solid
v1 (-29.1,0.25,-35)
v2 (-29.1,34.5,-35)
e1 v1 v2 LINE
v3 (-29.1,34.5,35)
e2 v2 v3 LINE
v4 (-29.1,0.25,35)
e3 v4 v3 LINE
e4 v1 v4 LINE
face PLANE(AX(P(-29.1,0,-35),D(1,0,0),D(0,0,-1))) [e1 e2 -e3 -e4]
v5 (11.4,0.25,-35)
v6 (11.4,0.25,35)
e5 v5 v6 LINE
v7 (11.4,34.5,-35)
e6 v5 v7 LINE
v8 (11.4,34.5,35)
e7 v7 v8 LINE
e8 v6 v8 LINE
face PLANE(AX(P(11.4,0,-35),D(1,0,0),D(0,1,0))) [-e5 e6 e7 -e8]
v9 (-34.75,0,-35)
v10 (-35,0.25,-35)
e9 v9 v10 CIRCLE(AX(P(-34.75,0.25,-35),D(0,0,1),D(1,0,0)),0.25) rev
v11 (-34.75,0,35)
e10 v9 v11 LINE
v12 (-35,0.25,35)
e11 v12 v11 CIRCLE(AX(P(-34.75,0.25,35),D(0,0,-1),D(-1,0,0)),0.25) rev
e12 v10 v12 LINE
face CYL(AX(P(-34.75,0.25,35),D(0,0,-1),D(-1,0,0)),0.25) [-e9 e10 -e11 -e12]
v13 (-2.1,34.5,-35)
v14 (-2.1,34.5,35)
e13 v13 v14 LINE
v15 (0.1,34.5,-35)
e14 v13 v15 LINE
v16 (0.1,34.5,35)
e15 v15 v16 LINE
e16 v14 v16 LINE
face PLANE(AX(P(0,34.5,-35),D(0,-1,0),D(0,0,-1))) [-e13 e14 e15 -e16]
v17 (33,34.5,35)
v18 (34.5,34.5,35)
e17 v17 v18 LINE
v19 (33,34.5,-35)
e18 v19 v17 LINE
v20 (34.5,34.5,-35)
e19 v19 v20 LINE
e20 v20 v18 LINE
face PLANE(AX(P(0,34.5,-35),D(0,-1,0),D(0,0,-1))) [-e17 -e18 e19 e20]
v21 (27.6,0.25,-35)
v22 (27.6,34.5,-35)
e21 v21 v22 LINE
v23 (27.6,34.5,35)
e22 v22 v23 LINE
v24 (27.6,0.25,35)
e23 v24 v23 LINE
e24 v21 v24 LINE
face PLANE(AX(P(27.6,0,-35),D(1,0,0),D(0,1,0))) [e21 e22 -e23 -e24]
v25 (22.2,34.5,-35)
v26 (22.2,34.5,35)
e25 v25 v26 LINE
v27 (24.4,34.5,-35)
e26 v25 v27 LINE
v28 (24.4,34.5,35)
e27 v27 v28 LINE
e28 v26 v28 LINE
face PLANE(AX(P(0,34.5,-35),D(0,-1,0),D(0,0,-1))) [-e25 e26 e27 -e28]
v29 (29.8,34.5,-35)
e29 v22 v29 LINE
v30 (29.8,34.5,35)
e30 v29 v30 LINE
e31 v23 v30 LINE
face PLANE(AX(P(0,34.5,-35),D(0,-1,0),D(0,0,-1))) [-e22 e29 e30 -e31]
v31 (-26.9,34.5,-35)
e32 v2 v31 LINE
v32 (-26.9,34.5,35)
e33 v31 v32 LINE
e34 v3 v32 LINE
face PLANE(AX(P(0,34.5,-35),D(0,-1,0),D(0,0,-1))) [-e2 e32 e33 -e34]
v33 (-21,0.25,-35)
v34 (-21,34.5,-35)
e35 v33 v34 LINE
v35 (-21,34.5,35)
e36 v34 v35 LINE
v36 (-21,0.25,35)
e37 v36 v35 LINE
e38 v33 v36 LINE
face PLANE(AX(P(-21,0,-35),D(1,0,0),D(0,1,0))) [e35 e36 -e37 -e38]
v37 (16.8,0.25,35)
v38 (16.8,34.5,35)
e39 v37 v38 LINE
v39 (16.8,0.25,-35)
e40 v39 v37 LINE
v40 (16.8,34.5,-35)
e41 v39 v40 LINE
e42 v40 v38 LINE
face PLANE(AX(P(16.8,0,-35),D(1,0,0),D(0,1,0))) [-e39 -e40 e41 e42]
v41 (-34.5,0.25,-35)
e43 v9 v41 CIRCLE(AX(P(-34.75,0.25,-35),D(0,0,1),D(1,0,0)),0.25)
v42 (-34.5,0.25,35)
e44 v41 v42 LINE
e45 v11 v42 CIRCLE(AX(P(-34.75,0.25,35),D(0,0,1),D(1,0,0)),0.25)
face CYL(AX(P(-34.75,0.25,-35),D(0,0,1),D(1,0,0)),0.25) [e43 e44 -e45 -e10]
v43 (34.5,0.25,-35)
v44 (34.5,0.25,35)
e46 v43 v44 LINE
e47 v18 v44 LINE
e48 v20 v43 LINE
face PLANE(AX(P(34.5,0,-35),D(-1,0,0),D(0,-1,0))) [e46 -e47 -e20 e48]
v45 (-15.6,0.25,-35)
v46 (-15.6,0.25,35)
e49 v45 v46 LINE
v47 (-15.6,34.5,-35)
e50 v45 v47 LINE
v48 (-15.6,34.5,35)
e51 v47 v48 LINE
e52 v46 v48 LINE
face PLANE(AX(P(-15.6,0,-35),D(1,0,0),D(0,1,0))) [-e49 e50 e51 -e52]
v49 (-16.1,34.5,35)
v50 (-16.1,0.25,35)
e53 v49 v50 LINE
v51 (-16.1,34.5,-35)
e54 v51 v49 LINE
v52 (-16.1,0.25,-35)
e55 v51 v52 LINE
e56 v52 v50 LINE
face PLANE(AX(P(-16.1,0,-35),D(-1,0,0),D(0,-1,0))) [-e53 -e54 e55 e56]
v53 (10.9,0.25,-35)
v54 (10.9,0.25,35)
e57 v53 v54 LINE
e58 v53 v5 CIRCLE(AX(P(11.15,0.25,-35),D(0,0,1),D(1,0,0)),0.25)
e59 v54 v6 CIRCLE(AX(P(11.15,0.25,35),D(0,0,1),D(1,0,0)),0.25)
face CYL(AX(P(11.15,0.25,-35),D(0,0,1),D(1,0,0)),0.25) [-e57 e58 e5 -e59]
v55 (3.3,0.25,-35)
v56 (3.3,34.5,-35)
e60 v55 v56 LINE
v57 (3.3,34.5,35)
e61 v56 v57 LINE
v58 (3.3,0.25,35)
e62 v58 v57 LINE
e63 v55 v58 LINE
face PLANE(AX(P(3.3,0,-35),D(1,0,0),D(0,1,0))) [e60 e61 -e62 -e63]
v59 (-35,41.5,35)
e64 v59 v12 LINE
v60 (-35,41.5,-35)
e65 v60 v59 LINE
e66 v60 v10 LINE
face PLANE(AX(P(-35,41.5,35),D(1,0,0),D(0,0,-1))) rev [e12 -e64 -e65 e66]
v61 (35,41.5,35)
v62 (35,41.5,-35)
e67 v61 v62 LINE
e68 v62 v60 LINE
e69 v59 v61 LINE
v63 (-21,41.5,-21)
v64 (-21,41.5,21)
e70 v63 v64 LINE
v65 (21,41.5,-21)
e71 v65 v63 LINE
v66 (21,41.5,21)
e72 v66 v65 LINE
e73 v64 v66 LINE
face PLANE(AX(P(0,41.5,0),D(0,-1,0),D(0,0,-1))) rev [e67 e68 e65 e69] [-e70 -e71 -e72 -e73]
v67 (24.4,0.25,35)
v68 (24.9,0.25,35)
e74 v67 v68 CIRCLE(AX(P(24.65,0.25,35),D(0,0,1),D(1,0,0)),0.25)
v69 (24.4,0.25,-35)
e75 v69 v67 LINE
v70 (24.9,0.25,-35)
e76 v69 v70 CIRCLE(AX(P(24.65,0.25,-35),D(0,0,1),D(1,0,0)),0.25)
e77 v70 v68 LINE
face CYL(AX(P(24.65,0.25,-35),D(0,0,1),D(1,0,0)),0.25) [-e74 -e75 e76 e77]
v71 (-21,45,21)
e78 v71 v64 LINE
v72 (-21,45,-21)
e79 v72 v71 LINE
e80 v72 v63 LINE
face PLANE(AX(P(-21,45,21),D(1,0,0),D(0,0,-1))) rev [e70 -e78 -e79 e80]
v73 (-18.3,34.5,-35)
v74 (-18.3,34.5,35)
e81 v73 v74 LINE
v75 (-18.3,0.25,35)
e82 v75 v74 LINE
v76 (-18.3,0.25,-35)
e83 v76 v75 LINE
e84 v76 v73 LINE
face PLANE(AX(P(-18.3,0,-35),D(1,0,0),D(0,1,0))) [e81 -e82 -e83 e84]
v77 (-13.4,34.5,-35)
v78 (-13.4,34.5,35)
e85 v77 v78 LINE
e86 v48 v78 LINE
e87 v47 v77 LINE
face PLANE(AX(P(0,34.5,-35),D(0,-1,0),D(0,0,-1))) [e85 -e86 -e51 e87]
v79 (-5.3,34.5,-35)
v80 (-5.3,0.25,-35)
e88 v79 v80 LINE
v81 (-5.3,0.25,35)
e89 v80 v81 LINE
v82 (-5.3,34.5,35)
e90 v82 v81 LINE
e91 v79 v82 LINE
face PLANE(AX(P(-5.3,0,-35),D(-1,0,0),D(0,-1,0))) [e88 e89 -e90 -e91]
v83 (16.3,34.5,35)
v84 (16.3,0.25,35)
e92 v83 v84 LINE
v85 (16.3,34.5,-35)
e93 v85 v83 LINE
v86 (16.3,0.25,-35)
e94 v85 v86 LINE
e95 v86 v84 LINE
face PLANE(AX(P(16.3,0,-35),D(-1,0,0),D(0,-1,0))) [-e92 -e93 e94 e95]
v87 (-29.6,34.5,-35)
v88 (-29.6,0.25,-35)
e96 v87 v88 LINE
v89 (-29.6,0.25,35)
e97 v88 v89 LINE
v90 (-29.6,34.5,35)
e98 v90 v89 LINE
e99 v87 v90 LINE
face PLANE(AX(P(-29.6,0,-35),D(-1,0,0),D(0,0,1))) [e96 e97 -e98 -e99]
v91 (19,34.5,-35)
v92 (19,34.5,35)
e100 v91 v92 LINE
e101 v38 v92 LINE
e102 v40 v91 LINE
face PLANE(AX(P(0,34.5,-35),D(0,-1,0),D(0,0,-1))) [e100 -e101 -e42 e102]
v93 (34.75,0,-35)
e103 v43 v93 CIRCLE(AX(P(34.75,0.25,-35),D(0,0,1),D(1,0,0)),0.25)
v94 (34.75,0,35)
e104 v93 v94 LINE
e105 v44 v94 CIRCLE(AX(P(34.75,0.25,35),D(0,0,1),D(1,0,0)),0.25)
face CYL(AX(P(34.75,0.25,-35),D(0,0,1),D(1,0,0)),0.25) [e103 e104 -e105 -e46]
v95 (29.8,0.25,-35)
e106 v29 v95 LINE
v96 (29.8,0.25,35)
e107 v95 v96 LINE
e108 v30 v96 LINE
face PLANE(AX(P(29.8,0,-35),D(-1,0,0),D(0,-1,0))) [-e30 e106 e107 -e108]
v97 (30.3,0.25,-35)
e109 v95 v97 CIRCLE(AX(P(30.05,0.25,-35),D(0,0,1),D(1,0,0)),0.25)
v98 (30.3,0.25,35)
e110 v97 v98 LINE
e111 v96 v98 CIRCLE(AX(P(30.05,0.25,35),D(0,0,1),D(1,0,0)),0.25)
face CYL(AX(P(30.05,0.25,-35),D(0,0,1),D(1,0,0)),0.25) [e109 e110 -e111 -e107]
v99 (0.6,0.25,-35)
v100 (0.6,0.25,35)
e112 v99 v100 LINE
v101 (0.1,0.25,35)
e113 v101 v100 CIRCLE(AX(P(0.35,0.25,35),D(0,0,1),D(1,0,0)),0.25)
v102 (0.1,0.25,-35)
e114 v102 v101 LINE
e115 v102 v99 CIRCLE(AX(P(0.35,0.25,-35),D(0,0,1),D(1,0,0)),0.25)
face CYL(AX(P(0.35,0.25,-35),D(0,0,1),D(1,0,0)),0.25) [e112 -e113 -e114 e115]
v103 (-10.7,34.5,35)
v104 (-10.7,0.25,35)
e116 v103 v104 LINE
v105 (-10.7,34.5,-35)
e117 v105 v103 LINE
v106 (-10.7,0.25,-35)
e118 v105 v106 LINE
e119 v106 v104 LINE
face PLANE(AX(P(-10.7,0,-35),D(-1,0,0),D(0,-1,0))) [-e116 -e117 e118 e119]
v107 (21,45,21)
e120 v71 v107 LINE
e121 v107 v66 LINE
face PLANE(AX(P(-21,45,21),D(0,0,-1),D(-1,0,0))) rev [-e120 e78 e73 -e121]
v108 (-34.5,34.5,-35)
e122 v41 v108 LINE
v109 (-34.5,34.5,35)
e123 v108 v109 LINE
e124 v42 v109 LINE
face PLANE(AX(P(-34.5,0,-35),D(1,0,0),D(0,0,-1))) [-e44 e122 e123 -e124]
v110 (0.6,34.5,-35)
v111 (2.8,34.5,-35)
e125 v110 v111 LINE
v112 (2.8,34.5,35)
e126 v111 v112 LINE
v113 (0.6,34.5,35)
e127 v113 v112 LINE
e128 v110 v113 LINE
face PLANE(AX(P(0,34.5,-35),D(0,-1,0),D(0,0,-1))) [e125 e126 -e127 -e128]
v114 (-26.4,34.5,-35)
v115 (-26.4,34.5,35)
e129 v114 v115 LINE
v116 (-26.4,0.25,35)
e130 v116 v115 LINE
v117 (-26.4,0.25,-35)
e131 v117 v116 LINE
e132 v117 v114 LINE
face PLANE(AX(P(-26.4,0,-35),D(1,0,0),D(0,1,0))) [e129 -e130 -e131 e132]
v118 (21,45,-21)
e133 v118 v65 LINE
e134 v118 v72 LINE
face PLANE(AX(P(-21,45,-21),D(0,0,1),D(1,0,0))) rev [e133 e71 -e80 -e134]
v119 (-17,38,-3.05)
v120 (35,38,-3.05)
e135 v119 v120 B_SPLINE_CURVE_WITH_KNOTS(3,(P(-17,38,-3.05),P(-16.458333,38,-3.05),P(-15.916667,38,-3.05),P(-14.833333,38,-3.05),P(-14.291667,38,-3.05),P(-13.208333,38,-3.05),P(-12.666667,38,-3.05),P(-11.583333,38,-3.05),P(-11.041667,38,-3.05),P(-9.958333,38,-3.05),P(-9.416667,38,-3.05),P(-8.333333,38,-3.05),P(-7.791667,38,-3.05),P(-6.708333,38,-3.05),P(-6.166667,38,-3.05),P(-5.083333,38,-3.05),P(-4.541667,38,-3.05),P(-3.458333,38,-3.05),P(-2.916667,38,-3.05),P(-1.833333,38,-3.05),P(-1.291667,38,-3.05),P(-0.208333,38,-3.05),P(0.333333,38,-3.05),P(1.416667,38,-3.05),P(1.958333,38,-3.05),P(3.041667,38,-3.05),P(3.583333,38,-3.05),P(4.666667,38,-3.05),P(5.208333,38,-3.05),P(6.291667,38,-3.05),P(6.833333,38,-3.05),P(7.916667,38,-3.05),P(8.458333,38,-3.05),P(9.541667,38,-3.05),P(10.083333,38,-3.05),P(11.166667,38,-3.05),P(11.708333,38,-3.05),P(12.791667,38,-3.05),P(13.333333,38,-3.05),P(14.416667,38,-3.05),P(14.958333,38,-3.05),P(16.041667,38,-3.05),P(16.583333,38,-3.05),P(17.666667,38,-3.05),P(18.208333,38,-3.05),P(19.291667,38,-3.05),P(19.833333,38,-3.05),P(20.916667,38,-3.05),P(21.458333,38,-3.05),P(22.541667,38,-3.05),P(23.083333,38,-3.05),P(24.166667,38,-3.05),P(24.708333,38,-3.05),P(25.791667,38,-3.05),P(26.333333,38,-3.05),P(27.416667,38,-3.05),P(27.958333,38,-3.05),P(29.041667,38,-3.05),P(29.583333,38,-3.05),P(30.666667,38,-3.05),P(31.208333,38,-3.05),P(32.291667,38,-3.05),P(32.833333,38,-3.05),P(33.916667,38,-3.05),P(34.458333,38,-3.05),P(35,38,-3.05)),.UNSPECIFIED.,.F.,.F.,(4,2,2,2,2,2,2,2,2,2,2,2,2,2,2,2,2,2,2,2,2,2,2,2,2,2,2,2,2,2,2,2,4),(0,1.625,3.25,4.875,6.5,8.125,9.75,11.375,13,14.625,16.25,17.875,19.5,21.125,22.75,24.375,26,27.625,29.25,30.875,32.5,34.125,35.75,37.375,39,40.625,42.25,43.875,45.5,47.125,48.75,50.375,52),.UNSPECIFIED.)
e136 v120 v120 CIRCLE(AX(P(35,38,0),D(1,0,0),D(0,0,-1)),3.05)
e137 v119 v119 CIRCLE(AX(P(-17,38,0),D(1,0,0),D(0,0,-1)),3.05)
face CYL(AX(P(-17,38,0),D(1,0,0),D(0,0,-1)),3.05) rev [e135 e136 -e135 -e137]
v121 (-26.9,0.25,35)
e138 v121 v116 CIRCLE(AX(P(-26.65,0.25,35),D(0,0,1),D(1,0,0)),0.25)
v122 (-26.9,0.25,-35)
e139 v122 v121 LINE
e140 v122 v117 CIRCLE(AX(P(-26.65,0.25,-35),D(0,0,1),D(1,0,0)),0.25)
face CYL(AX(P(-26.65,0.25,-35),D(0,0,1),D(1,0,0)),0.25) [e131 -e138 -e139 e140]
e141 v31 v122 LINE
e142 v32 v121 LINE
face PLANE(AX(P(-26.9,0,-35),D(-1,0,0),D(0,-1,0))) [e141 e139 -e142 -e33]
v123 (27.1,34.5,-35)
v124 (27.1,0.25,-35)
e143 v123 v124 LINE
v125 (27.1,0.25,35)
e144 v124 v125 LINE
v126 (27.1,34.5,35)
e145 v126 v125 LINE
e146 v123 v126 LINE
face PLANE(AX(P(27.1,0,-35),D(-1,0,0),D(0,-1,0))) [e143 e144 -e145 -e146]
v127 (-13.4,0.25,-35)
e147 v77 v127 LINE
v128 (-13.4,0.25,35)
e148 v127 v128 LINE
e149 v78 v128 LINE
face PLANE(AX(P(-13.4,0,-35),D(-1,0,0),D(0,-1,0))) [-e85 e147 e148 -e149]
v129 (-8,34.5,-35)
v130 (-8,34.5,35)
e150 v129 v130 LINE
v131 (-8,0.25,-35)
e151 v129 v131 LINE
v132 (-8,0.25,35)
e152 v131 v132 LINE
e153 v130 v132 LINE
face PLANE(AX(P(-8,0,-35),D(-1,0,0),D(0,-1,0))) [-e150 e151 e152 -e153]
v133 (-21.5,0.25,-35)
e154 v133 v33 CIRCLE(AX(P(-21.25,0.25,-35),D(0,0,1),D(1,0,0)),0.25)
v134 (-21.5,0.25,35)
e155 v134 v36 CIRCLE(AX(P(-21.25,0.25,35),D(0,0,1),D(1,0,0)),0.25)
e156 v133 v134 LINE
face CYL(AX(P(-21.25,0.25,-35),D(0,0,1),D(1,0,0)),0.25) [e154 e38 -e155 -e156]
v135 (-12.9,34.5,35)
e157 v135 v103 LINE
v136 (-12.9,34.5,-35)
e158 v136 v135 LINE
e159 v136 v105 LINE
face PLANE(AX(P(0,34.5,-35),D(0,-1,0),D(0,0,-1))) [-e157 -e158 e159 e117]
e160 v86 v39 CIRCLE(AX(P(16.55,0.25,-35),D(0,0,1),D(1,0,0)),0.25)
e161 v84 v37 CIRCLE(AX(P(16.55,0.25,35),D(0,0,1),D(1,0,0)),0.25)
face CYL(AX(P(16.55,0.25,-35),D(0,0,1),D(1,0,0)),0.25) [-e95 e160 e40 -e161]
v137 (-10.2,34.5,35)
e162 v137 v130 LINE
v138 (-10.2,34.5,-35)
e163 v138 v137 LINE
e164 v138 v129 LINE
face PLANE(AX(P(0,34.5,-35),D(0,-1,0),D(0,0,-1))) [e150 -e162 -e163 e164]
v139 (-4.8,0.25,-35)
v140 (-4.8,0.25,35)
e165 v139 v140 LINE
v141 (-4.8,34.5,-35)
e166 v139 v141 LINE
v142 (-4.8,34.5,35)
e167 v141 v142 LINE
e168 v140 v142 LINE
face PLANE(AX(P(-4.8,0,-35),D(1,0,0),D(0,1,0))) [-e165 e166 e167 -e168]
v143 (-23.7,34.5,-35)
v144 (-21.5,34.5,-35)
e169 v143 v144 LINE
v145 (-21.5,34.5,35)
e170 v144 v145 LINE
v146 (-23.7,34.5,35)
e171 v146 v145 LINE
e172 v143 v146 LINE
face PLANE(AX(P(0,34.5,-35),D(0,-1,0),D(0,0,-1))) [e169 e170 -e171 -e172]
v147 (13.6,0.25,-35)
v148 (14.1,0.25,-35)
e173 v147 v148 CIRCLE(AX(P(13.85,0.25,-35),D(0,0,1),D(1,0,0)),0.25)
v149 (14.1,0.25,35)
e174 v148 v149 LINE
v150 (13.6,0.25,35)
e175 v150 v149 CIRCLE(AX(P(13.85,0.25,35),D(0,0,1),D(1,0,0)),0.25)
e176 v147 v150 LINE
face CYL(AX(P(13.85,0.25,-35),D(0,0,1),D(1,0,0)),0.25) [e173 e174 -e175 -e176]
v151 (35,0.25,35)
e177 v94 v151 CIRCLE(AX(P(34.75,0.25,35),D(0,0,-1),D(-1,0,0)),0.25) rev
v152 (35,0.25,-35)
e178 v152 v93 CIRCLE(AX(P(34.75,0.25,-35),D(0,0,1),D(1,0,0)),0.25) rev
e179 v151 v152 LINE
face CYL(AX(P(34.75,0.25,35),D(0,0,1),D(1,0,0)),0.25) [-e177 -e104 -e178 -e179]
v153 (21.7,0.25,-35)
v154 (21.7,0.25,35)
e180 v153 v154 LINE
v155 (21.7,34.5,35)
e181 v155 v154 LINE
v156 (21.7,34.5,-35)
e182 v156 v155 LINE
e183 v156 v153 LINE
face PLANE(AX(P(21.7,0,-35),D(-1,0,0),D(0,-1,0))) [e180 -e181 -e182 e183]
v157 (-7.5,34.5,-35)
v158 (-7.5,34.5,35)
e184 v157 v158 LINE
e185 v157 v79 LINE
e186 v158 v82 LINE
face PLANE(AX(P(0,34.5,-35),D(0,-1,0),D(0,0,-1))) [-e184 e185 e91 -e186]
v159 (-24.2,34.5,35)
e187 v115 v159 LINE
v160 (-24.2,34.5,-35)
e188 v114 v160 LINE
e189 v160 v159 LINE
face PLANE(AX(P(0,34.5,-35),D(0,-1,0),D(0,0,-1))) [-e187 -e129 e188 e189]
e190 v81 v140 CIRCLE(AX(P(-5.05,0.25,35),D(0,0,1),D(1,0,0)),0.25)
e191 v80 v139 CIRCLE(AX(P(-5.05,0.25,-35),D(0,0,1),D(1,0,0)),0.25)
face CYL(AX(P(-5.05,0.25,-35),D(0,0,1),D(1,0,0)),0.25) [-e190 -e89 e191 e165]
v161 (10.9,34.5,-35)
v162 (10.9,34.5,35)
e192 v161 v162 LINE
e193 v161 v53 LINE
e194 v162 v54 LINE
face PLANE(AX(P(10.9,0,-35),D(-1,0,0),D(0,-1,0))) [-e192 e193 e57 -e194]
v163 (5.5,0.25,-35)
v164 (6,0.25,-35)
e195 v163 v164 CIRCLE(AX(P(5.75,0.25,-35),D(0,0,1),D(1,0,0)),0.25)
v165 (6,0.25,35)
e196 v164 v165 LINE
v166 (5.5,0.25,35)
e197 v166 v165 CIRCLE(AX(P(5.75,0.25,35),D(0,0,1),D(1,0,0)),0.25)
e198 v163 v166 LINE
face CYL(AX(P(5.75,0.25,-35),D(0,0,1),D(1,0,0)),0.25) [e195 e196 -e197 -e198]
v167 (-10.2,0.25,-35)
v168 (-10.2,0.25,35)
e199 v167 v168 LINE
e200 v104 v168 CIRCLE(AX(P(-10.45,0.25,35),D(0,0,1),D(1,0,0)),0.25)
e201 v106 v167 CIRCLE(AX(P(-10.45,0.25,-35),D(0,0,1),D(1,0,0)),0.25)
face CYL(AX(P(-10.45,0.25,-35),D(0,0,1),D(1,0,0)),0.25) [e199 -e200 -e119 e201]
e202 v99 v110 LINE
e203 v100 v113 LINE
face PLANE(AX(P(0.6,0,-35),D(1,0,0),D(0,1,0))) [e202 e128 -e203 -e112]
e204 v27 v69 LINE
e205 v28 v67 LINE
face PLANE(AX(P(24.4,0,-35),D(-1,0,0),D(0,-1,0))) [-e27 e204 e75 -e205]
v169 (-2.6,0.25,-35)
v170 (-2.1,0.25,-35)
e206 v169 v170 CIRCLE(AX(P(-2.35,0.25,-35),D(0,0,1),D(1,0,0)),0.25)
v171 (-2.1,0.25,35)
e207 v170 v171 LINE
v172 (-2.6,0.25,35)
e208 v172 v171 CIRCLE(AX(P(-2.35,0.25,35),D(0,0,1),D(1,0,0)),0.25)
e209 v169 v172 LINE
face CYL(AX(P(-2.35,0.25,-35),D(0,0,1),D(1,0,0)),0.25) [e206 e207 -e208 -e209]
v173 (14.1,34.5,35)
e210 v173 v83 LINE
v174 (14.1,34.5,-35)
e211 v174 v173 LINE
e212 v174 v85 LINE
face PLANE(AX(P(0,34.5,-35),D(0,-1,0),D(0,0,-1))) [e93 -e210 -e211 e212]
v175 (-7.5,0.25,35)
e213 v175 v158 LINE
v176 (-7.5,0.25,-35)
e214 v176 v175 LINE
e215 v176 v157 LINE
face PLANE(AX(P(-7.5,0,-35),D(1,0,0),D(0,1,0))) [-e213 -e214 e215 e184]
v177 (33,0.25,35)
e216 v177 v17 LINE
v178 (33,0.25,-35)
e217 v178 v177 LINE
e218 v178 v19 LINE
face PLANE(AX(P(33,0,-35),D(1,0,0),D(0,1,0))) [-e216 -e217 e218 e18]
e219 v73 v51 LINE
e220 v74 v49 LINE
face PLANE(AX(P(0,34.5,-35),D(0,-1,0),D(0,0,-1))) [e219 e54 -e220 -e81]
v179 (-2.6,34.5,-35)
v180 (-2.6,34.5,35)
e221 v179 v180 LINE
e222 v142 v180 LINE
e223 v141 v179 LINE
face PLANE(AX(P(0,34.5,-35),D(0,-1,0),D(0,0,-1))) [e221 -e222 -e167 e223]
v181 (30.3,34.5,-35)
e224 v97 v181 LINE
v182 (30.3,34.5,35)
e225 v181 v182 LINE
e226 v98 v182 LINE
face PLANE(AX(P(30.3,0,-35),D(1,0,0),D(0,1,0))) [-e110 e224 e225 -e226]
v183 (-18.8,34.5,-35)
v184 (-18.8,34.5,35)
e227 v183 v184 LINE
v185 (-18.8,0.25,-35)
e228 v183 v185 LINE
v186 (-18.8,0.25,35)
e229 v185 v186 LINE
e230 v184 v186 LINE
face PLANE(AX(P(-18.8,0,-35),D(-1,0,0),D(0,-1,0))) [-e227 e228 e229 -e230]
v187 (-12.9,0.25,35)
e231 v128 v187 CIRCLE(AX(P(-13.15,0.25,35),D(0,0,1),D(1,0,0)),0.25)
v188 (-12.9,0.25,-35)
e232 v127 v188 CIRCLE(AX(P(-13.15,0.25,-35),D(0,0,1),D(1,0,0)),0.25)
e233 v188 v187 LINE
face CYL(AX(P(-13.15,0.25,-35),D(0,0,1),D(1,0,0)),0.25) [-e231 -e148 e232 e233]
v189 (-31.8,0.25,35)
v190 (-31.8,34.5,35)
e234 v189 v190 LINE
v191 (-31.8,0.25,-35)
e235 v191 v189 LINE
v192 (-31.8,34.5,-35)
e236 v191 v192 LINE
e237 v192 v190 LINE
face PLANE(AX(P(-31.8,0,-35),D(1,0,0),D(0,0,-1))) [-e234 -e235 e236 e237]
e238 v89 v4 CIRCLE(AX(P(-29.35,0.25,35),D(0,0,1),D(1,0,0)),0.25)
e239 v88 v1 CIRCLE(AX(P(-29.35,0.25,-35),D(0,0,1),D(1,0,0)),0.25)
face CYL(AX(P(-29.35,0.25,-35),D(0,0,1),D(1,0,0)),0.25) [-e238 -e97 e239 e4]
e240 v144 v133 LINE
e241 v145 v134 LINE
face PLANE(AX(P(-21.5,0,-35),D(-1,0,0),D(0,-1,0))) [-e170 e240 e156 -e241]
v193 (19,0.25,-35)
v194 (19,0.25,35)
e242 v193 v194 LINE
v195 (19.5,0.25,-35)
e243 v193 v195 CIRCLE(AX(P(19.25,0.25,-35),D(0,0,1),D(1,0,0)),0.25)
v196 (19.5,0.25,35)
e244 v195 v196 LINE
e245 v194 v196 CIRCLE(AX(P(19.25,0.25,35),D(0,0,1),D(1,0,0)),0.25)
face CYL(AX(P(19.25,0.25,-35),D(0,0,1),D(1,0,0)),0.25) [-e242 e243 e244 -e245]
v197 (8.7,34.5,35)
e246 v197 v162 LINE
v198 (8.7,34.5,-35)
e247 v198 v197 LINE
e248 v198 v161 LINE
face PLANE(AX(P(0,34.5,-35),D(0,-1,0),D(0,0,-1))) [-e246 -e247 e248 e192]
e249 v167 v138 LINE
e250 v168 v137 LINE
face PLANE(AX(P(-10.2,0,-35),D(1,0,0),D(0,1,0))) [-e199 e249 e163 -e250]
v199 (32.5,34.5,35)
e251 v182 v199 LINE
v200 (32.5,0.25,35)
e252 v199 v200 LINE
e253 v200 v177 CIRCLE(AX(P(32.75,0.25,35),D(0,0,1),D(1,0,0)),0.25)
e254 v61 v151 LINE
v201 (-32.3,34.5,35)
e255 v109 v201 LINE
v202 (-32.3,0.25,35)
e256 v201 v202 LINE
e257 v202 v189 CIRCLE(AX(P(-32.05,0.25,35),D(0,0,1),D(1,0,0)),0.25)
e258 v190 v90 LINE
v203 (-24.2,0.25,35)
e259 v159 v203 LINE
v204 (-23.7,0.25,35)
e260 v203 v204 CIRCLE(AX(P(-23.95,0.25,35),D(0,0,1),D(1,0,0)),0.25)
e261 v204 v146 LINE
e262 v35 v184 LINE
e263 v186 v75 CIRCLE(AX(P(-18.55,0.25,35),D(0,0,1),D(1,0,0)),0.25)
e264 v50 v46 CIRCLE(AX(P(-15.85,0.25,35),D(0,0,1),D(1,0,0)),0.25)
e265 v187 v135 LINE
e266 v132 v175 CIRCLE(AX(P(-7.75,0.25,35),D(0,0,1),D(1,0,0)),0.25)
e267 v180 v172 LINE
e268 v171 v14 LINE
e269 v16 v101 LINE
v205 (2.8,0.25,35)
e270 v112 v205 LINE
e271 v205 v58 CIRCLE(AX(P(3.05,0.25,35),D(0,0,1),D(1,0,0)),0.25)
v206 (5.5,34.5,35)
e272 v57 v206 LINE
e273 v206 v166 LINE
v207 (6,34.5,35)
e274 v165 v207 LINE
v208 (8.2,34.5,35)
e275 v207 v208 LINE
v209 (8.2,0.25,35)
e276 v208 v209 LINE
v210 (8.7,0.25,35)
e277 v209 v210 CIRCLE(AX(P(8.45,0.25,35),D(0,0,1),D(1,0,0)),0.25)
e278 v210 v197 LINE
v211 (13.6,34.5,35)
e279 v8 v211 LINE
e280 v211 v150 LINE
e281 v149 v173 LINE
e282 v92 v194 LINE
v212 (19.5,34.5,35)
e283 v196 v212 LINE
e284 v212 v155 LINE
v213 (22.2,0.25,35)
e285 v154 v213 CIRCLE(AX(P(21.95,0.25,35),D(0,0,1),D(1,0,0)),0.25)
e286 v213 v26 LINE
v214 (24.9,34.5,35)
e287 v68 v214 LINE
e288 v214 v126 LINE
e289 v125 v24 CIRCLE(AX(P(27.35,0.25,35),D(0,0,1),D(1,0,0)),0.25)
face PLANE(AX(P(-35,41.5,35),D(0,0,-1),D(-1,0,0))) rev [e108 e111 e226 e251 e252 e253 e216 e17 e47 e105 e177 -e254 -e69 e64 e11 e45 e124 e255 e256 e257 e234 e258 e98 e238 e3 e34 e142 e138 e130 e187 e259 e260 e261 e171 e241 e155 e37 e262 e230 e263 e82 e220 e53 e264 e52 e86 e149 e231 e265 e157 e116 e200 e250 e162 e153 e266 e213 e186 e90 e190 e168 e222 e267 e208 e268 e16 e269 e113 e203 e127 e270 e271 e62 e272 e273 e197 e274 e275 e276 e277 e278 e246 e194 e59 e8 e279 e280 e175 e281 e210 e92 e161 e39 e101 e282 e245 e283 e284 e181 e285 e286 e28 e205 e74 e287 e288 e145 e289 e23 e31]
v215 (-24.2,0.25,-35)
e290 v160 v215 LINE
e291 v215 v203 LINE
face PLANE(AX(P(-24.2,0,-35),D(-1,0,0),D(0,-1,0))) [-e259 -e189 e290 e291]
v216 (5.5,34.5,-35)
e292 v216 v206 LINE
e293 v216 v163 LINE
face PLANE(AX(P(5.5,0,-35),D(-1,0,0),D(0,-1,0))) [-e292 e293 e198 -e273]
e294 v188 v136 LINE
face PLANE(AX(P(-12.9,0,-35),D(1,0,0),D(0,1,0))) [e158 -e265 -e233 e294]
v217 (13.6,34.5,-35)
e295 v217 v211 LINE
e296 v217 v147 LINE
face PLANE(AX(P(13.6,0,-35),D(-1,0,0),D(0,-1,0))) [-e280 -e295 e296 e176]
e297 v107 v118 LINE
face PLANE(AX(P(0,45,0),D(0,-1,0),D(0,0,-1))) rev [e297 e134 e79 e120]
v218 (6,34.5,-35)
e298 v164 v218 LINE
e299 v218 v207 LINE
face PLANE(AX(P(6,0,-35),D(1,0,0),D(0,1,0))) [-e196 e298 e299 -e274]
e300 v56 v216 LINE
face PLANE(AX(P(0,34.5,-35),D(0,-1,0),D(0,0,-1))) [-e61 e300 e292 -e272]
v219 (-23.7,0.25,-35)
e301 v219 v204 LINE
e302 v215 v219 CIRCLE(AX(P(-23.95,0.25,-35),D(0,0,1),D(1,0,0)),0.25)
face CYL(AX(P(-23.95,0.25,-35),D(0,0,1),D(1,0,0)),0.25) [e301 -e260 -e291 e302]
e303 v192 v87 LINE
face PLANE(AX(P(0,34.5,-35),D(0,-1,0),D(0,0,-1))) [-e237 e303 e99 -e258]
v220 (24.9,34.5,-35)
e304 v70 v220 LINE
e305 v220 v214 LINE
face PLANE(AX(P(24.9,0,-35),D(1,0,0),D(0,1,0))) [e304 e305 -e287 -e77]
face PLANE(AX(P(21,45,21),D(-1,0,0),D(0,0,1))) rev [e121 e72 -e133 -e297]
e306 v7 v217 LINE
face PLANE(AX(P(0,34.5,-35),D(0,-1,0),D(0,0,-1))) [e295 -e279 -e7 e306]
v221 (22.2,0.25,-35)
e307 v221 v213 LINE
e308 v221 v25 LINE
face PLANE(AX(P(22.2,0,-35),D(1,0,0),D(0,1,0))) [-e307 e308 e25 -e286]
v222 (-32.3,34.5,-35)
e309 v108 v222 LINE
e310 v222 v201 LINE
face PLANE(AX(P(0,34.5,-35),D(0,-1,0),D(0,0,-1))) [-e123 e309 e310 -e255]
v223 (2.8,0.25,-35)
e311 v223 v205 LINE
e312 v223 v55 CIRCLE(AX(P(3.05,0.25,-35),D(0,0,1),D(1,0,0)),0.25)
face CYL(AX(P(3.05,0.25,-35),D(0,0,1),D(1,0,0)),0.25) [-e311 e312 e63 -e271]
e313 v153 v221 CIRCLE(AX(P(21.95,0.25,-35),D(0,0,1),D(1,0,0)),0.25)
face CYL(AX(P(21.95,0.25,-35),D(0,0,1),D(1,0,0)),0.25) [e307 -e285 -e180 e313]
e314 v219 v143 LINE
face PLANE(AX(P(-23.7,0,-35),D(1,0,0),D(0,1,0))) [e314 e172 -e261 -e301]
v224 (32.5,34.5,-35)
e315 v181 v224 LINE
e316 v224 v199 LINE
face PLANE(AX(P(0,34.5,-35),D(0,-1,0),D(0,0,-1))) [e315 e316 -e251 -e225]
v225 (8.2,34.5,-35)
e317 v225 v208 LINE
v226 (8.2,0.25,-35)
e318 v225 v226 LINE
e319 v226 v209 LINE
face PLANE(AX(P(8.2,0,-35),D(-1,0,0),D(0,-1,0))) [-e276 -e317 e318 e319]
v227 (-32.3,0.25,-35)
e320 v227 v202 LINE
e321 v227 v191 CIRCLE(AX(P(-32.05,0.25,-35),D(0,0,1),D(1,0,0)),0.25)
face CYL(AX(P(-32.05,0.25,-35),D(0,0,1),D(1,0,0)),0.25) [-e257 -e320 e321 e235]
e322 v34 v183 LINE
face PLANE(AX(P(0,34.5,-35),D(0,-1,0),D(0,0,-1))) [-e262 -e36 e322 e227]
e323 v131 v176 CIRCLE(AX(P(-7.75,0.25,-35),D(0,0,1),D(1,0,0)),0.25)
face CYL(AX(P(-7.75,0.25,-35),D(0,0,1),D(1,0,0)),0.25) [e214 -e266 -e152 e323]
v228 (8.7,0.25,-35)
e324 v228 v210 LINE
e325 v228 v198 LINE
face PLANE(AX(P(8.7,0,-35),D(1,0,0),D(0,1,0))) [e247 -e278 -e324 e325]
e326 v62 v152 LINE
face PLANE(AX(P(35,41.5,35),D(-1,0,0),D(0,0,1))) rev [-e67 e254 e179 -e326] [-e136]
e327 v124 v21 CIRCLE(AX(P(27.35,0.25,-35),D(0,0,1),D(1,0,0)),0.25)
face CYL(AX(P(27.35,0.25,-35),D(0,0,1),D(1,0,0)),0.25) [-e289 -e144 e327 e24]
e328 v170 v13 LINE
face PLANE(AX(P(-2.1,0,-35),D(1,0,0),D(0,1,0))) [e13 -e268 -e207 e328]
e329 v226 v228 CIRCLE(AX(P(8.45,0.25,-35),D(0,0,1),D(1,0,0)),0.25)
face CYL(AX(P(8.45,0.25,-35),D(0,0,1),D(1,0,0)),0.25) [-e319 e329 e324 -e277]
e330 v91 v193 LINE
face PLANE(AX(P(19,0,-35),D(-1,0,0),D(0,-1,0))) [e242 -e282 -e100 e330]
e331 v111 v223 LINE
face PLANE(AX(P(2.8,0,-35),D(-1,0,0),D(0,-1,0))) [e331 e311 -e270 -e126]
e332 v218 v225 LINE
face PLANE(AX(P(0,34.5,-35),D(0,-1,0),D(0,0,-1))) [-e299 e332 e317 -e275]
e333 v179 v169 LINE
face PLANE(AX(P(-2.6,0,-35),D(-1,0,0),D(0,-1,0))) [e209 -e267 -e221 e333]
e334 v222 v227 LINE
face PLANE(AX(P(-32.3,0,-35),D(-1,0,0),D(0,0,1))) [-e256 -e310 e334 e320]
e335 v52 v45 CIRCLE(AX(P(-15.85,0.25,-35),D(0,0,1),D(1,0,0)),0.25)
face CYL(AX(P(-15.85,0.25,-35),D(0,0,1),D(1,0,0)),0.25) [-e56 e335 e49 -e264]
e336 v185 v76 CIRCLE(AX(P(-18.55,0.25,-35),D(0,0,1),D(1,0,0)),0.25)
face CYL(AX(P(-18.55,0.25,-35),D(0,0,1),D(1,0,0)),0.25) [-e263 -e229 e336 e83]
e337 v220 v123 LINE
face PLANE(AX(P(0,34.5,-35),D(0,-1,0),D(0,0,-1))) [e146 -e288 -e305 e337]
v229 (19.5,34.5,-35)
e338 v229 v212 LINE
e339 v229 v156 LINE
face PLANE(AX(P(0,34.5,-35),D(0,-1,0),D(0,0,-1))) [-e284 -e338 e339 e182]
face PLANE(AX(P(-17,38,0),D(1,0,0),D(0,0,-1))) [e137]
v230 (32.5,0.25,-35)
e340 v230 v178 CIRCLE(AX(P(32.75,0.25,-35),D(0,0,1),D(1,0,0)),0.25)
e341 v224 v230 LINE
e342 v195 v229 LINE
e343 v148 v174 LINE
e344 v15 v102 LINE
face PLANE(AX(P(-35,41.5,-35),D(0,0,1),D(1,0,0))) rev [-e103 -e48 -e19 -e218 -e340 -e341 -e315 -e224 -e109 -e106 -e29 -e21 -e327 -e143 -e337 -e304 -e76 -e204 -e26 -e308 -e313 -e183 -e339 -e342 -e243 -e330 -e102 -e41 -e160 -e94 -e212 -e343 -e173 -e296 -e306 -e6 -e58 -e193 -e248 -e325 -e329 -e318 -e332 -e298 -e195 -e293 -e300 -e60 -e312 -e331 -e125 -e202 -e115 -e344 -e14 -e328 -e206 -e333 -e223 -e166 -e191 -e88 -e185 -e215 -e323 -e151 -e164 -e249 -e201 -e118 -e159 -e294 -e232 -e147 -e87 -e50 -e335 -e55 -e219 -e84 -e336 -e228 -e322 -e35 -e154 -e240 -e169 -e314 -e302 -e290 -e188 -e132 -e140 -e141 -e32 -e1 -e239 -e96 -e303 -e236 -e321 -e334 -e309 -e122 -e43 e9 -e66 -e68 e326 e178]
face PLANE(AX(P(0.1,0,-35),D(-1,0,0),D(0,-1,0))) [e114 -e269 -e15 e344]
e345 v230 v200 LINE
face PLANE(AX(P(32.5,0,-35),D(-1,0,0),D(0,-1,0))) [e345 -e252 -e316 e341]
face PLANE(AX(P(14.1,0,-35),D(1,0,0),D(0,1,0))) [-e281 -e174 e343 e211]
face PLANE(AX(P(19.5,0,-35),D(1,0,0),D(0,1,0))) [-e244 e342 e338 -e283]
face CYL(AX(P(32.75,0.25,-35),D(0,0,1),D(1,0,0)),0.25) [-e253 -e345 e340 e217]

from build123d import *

# Parameters (mm, degrees)
SKETCH_1_W          = 70
SKETCH_1_H          = 70
EXTRUDE_1_DEPTH     = 41.5
SKETCH_2_W          = 42
SKETCH_2_H          = 42
EXTRUDE_2_DEPTH     = 3.5
CUT_EXTRUDE_1_DEPTH = 91.277350426
FILLET_1_R          = 0.25
FILLET_2_R          = 0.25
SKETCH_6_R          = 3.05
CUT_EXTRUDE_2_DEPTH = 52


with BuildPart() as part:
    # 草图1 → 凸台-拉伸1 (new body)
    with BuildSketch(Plane(origin=(0, 0, 0), x_dir=(1, 0, 0), z_dir=(0, 1, 0))):
        Rectangle(SKETCH_1_W, SKETCH_1_H)
    extrude(amount=EXTRUDE_1_DEPTH)

    # 草图2 → 凸台-拉伸2 (add)
    with BuildSketch(Plane(origin=(0, 41.5, 0), x_dir=(1, 0, 0), z_dir=(0, 1, 0))):
        Rectangle(SKETCH_2_W, SKETCH_2_H)
    extrude(amount=EXTRUDE_2_DEPTH)

    # 草图3 → 切除-拉伸1 (cut, through all)
    with BuildSketch(Plane.XY.offset(35)):
        with BuildLine():
            Line((-32.3, 34.5), (-34.5, 34.5))
            Line((-34.5, 34.5), (-34.5, 0.25))
            ThreePointArc((-34.5, 0.25), (-34.573223305, 0.073223305), (-34.75, 0))
            Line((-34.75, 0), (-32.05, 0))
            ThreePointArc((-32.05, 0), (-32.226776695, 0.073223305), (-32.3, 0.25))
            Line((-32.3, 0.25), (-32.3, 34.5))
        make_face()
        with BuildLine():
            Line((-29.6, 34.5), (-31.8, 34.5))
            Line((-31.8, 34.5), (-31.8, 0.25))
            ThreePointArc((-31.8, 0.25), (-31.873223305, 0.073223305), (-32.05, 0))
            Line((-32.05, 0), (-29.35, 0))
            ThreePointArc((-29.35, 0), (-29.526776695, 0.073223305), (-29.6, 0.25))
            Line((-29.6, 0.25), (-29.6, 34.5))
        make_face()
        with BuildLine():
            ThreePointArc((-29.1, 0.25), (-29.173223305, 0.073223305), (-29.35, 0))
            Line((-29.35, 0), (-26.65, 0))
            ThreePointArc((-26.65, 0), (-26.826776695, 0.073223305), (-26.9, 0.25))
            Line((-26.9, 0.25), (-26.9, 34.5))
            Line((-26.9, 34.5), (-29.1, 34.5))
            Line((-29.1, 34.5), (-29.1, 0.25))
        make_face()
        with BuildLine():
            ThreePointArc((-26.4, 0.25), (-26.473223305, 0.073223305), (-26.65, 0))
            Line((-26.65, 0), (-23.95, 0))
            ThreePointArc((-23.95, 0), (-24.126776695, 0.073223305), (-24.2, 0.25))
            Line((-24.2, 0.25), (-24.2, 34.5))
            Line((-24.2, 34.5), (-26.4, 34.5))
            Line((-26.4, 34.5), (-26.4, 0.25))
        make_face()
        with BuildLine():
            ThreePointArc((-23.7, 0.25), (-23.773223305, 0.073223305), (-23.95, 0))
            Line((-23.95, 0), (-21.25, 0))
            ThreePointArc((-21.25, 0), (-21.426776695, 0.073223305), (-21.5, 0.25))
            Line((-21.5, 0.25), (-21.5, 34.5))
            Line((-21.5, 34.5), (-23.7, 34.5))
            Line((-23.7, 34.5), (-23.7, 0.25))
        make_face()
        with BuildLine():
            ThreePointArc((-21, 0.25), (-21.073223305, 0.073223305), (-21.25, 0))
            Line((-21.25, 0), (-18.55, 0))
            ThreePointArc((-18.55, 0), (-18.726776695, 0.073223305), (-18.8, 0.25))
            Line((-18.8, 0.25), (-18.8, 34.5))
            Line((-18.8, 34.5), (-21, 34.5))
            Line((-21, 34.5), (-21, 0.25))
        make_face()
        with BuildLine():
            ThreePointArc((-18.3, 0.25), (-18.373223305, 0.073223305), (-18.55, 0))
            Line((-18.55, 0), (-15.85, 0))
            ThreePointArc((-15.85, 0), (-16.026776695, 0.073223305), (-16.1, 0.25))
            Line((-16.1, 0.25), (-16.1, 34.5))
            Line((-16.1, 34.5), (-18.3, 34.5))
            Line((-18.3, 34.5), (-18.3, 0.25))
        make_face()
        with BuildLine():
            ThreePointArc((-15.6, 0.25), (-15.673223305, 0.073223305), (-15.85, 0))
            Line((-15.85, 0), (-13.15, 0))
            ThreePointArc((-13.15, 0), (-13.326776695, 0.073223305), (-13.4, 0.25))
            Line((-13.4, 0.25), (-13.4, 34.5))
            Line((-13.4, 34.5), (-15.6, 34.5))
            Line((-15.6, 34.5), (-15.6, 0.25))
        make_face()
        with BuildLine():
            ThreePointArc((-12.9, 0.25), (-12.973223305, 0.073223305), (-13.15, 0))
            Line((-13.15, 0), (-10.45, 0))
            ThreePointArc((-10.45, 0), (-10.626776695, 0.073223305), (-10.7, 0.25))
            Line((-10.7, 0.25), (-10.7, 34.5))
            Line((-10.7, 34.5), (-12.9, 34.5))
            Line((-12.9, 34.5), (-12.9, 0.25))
        make_face()
        with BuildLine():
            ThreePointArc((-10.2, 0.25), (-10.273223305, 0.073223305), (-10.45, 0))
            Line((-10.45, 0), (-7.75, 0))
            ThreePointArc((-7.75, 0), (-7.926776695, 0.073223305), (-8, 0.25))
            Line((-8, 0.25), (-8, 34.5))
            Line((-8, 34.5), (-10.2, 34.5))
            Line((-10.2, 34.5), (-10.2, 0.25))
        make_face()
        with BuildLine():
            ThreePointArc((-7.5, 0.25), (-7.573223305, 0.073223305), (-7.75, 0))
            Line((-7.75, 0), (-5.05, 0))
            ThreePointArc((-5.05, 0), (-5.226776695, 0.073223305), (-5.3, 0.25))
            Line((-5.3, 0.25), (-5.3, 34.5))
            Line((-5.3, 34.5), (-7.5, 34.5))
            Line((-7.5, 34.5), (-7.5, 0.25))
        make_face()
        with BuildLine():
            ThreePointArc((-4.8, 0.25), (-4.873223305, 0.073223305), (-5.05, 0))
            Line((-5.05, 0), (-2.349999993, 0))
            ThreePointArc((-2.349999993, 0), (-2.526776693, 0.073223302), (-2.6, 0.25))
            Line((-2.6, 0.25), (-2.6, 34.5))
            Line((-2.6, 34.5), (-4.8, 34.5))
            Line((-4.8, 34.5), (-4.8, 0.25))
        make_face()
        with BuildLine():
            ThreePointArc((-2.1, 0.25), (-2.173223302, 0.073223307), (-2.349999993, 0))
            Line((-2.349999993, 0), (0.350000005, 0))
            ThreePointArc((0.350000005, 0), (0.173223306, 0.073223303), (0.1, 0.25))
            Line((0.1, 0.25), (0.1, 34.5))
            Line((0.1, 34.5), (-2.1, 34.5))
            Line((-2.1, 34.5), (-2.1, 0.25))
        make_face()
        with BuildLine():
            ThreePointArc((0.6, 0.25), (0.526776697, 0.073223306), (0.350000005, 0))
            Line((0.350000005, 0), (3.05, 0))
            ThreePointArc((3.05, 0), (2.873223305, 0.073223305), (2.8, 0.25))
            Line((2.8, 0.25), (2.8, 34.5))
            Line((2.8, 34.5), (0.6, 34.5))
            Line((0.6, 34.5), (0.6, 0.25))
        make_face()
        with BuildLine():
            ThreePointArc((3.3, 0.25), (3.226776695, 0.073223305), (3.05, 0))
            Line((3.05, 0), (5.749999995, 0))
            ThreePointArc((5.749999995, 0), (5.573223303, 0.073223307), (5.5, 0.25))
            Line((5.5, 0.25), (5.5, 34.5))
            Line((5.5, 34.5), (3.3, 34.5))
            Line((3.3, 34.5), (3.3, 0.25))
        make_face()
        with BuildLine():
            ThreePointArc((6, 0.25), (5.926776693, 0.073223303), (5.749999995, 0))
            Line((5.749999995, 0), (8.45, 0))
            ThreePointArc((8.45, 0), (8.273223305, 0.073223305), (8.2, 0.25))
            Line((8.2, 0.25), (8.2, 34.5))
            Line((8.2, 34.5), (6, 34.5))
            Line((6, 34.5), (6, 0.25))
        make_face()
        with BuildLine():
            ThreePointArc((8.7, 0.25), (8.626776695, 0.073223305), (8.45, 0))
            Line((8.45, 0), (11.149999998, 0))
            ThreePointArc((11.149999998, 0), (10.973223304, 0.073223305), (10.9, 0.25))
            Line((10.9, 0.25), (10.9, 34.5))
            Line((10.9, 34.5), (8.7, 34.5))
            Line((8.7, 34.5), (8.7, 0.25))
        make_face()
        with BuildLine():
            ThreePointArc((11.4, 0.25), (11.326776695, 0.073223304), (11.149999998, 0))
            Line((11.149999998, 0), (13.85, 0))
            ThreePointArc((13.85, 0), (13.673223305, 0.073223305), (13.6, 0.25))
            Line((13.6, 0.25), (13.6, 34.5))
            Line((13.6, 34.5), (11.4, 34.5))
            Line((11.4, 34.5), (11.4, 0.25))
        make_face()
        with BuildLine():
            ThreePointArc((14.1, 0.25), (14.026776695, 0.073223305), (13.85, 0))
            Line((13.85, 0), (16.55, 0))
            ThreePointArc((16.55, 0), (16.373223305, 0.073223305), (16.3, 0.25))
            Line((16.3, 0.25), (16.3, 34.5))
            Line((16.3, 34.5), (14.1, 34.5))
            Line((14.1, 34.5), (14.1, 0.25))
        make_face()
        with BuildLine():
            ThreePointArc((16.8, 0.25), (16.726776695, 0.073223305), (16.55, 0))
            Line((16.55, 0), (19.25, 0))
            ThreePointArc((19.25, 0), (19.073223305, 0.073223305), (19, 0.25))
            Line((19, 0.25), (19, 34.5))
            Line((19, 34.5), (16.8, 34.5))
            Line((16.8, 34.5), (16.8, 0.25))
        make_face()
        with BuildLine():
            ThreePointArc((19.5, 0.25), (19.426776695, 0.073223305), (19.25, 0))
            Line((19.25, 0), (21.95, 0))
            ThreePointArc((21.95, 0), (21.773223305, 0.073223305), (21.7, 0.25))
            Line((21.7, 0.25), (21.7, 34.5))
            Line((21.7, 34.5), (19.5, 34.5))
            Line((19.5, 34.5), (19.5, 0.25))
        make_face()
        with BuildLine():
            ThreePointArc((22.2, 0.25), (22.126776695, 0.073223305), (21.95, 0))
            Line((21.95, 0), (24.65, 0))
            ThreePointArc((24.65, 0), (24.473223305, 0.073223305), (24.4, 0.25))
            Line((24.4, 0.25), (24.4, 34.5))
            Line((24.4, 34.5), (22.2, 34.5))
            Line((22.2, 34.5), (22.2, 0.25))
        make_face()
        with BuildLine():
            ThreePointArc((24.9, 0.25), (24.826776695, 0.073223305), (24.65, 0))
            Line((24.65, 0), (27.35, 0))
            ThreePointArc((27.35, 0), (27.173223305, 0.073223305), (27.1, 0.25))
            Line((27.1, 0.25), (27.1, 34.5))
            Line((27.1, 34.5), (24.9, 34.5))
            Line((24.9, 34.5), (24.9, 0.25))
        make_face()
        with BuildLine():
            ThreePointArc((27.6, 0.25), (27.526776695, 0.073223305), (27.35, 0))
            Line((27.35, 0), (30.049999996, 0))
            ThreePointArc((30.049999996, 0), (29.873223303, 0.073223306), (29.8, 0.25))
            Line((29.8, 0.25), (29.8, 34.5))
            Line((29.8, 34.5), (27.6, 34.5))
            Line((27.6, 34.5), (27.6, 0.25))
        make_face()
        with BuildLine():
            ThreePointArc((30.3, 0.25), (30.226776694, 0.073223303), (30.049999996, 0))
            Line((30.049999996, 0), (32.75, 0))
            ThreePointArc((32.75, 0), (32.573223305, 0.073223305), (32.5, 0.25))
            Line((32.5, 0.25), (32.5, 34.5))
            Line((32.5, 34.5), (30.3, 34.5))
            Line((30.3, 34.5), (30.3, 0.25))
        make_face()
        with BuildLine():
            ThreePointArc((33, 0.25), (32.926776695, 0.073223305), (32.75, 0))
            Line((32.75, 0), (34.749999997, 0))
            ThreePointArc((34.749999997, 0), (34.573223304, 0.073223306), (34.5, 0.25))
            Line((34.5, 0.25), (34.5, 34.5))
            Line((34.5, 34.5), (33, 34.5))
            Line((33, 34.5), (33, 0.25))
        make_face()
    extrude(amount=-CUT_EXTRUDE_1_DEPTH, mode=Mode.SUBTRACT)

    # 圆角1
    fillet_1_edges = [part.edges().sort_by_distance(p)[0] for p in [
        (-35, 0, 0),
    ]]
    fillet(fillet_1_edges, radius=FILLET_1_R - 0.0001)  # a hair under: the kernel refuses the full size

    # 圆角2
    fillet_2_edges = [part.edges().sort_by_distance(p)[0] for p in [
        (35, 0, 0),
    ]]
    fillet(fillet_2_edges, radius=FILLET_2_R)

    # 草图6 → 切除-拉伸2 (cut)
    with BuildSketch(Plane(origin=(35, 0, 0), x_dir=(0, 0, -1), z_dir=(1, 0, 0))):
        with Locations((0, 38)):
            Circle(SKETCH_6_R)
    extrude(amount=-CUT_EXTRUDE_2_DEPTH, mode=Mode.SUBTRACT)


solid = part.part
